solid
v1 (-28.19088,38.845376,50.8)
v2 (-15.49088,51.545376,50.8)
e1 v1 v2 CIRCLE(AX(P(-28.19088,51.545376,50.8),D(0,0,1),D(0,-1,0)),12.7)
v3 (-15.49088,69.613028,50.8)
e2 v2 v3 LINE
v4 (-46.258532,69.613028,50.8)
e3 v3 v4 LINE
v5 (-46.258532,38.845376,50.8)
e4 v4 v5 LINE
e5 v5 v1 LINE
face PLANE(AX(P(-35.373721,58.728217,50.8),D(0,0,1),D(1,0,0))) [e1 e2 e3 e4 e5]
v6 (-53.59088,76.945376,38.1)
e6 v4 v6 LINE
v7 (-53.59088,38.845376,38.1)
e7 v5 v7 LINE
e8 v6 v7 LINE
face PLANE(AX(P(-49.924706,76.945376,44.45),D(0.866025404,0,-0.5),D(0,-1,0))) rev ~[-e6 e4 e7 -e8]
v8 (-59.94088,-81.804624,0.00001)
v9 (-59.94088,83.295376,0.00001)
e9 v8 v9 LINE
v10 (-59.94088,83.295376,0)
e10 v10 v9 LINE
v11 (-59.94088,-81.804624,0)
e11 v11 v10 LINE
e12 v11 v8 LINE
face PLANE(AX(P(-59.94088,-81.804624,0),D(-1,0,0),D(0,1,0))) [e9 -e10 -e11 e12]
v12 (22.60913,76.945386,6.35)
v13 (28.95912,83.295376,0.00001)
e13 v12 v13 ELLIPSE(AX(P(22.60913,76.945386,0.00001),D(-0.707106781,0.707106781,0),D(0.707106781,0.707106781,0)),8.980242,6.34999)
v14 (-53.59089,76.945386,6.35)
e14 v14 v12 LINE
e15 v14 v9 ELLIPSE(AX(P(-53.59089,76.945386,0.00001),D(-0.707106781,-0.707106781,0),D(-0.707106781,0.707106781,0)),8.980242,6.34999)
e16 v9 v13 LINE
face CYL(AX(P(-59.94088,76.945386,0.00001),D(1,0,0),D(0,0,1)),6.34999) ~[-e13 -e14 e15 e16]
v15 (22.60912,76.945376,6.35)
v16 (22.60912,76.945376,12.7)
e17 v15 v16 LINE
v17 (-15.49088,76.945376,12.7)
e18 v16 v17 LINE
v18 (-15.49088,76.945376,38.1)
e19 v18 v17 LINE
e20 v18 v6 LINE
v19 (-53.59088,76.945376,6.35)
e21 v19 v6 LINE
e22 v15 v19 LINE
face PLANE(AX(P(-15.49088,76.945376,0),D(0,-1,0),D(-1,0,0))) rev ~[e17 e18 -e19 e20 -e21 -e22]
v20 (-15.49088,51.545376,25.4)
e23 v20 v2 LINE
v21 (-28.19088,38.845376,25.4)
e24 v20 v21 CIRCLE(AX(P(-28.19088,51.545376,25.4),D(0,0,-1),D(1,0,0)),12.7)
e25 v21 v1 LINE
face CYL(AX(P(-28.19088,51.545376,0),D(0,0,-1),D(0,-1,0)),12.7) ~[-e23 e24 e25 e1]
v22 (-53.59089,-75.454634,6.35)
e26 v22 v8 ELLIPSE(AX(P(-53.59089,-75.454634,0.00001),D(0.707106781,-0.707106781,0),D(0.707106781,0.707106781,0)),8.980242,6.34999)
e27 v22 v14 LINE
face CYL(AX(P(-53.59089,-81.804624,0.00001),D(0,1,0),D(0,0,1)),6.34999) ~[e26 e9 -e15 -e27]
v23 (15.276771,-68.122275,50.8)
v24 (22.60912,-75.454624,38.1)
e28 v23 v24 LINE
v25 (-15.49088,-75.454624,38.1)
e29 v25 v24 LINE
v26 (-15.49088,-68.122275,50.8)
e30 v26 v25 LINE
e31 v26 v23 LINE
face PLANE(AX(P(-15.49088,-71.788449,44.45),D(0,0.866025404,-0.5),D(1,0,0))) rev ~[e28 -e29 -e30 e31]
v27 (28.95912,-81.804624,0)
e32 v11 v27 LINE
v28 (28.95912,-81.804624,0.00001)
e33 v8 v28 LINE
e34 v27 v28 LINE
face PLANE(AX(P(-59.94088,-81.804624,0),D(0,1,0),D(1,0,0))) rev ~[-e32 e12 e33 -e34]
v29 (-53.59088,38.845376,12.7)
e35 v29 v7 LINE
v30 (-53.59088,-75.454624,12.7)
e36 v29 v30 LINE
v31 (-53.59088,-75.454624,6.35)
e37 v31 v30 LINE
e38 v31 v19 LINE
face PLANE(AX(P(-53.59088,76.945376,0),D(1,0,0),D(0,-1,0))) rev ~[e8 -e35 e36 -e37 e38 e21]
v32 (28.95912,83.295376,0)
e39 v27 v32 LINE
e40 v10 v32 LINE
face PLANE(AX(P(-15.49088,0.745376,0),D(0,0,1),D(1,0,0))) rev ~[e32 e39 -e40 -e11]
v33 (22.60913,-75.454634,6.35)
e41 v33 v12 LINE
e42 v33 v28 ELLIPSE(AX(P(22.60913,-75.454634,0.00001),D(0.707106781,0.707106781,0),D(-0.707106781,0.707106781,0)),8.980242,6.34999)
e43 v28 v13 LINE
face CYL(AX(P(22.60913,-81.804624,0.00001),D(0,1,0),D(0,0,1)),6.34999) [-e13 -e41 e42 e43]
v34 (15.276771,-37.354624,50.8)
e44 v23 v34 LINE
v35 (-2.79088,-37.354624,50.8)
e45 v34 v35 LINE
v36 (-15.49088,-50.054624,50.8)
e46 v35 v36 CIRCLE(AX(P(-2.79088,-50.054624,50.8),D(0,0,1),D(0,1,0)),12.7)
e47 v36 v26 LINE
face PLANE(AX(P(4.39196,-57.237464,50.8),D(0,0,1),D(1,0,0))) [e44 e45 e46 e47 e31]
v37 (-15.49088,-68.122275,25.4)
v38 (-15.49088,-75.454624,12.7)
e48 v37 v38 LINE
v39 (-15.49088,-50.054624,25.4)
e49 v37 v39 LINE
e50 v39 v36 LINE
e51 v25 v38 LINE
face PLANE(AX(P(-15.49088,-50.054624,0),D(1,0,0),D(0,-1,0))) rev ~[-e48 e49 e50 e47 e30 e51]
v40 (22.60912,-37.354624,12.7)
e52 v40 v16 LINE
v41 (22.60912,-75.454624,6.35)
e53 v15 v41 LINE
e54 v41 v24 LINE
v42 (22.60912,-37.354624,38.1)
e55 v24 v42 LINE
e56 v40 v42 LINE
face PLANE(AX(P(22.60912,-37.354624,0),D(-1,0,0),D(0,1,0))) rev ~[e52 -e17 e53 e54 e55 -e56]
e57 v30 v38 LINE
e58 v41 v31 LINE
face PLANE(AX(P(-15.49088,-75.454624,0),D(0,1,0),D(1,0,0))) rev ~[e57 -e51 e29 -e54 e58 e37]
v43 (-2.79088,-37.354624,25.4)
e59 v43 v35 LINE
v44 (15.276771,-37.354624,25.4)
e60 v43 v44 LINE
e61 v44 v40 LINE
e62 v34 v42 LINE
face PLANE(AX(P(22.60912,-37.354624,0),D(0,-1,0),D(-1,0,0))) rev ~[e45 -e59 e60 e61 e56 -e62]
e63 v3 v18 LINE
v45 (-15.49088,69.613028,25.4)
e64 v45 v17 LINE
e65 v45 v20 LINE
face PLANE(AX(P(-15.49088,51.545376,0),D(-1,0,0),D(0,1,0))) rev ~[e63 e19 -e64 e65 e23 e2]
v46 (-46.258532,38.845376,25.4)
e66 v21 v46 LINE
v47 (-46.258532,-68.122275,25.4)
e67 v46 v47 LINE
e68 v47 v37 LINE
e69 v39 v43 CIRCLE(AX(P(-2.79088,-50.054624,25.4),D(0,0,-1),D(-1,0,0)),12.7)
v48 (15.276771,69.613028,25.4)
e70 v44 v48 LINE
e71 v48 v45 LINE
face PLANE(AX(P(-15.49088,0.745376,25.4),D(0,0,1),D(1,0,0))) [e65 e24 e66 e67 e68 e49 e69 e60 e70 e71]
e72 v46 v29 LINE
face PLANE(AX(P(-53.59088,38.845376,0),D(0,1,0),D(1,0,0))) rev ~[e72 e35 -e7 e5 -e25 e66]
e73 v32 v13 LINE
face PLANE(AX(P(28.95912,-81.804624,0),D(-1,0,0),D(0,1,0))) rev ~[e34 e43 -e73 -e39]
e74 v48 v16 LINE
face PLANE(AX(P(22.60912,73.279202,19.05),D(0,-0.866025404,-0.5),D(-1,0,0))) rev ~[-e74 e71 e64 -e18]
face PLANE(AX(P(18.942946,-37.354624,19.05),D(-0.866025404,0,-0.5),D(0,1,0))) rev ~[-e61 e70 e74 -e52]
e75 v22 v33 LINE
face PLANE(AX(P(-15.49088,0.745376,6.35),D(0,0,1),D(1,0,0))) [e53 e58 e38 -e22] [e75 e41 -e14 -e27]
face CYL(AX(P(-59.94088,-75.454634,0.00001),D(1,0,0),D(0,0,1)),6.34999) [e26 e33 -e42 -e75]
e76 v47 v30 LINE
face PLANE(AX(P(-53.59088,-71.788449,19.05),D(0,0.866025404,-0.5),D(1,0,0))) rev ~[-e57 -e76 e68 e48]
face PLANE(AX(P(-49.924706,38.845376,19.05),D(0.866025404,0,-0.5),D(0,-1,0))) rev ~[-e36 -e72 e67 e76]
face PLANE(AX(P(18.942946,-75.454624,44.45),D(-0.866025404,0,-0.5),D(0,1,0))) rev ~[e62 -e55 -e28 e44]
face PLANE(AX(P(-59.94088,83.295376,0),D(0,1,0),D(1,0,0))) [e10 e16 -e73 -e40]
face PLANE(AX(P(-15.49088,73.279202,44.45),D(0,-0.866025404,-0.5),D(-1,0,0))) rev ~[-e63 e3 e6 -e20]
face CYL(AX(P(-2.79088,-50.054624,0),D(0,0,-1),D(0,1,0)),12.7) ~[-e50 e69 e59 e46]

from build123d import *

# Parameters (mm, degrees)
F0_W       = 88.9
F0_H       = 165.1
F1_DEPTH   = 6.35
F2_DEPTH   = 25.4
F3_DEPTH   = 50.8
F4_R       = 6.34999
F5_SIZE2   = 12.7
F5_SIZE    = 7.3323484187
F6_SIZE2   = 12.7
F6_SIZE    = 7.3323484187
F6_2_SIZE2 = 12.7
F6_2_SIZE  = 7.3323484187


# Not quite as in the source:
# - a fillet or chamfer is up to 0.001 mm smaller than in the source, because OpenCascade refuses the exact size


with BuildPart() as f1:
    # F0 (on Top) → F1 (new body)
    with BuildSketch(Plane.XY):
        with Locations((-15.4908802681, 0.7453764391)):
            Rectangle(F0_W, F0_H)
        Polygon((-53.5908802681, 38.8453764391), (-53.5908802681, 76.9453764391), (-15.4908802681, 76.9453764391), (22.6091197319, 76.9453764391), (22.6091197319, -37.3546235609), (22.6091197319, -75.4546235609), (-15.4908802681, -75.4546235609), (-53.5908802681, -75.4546235609), align=None, mode=Mode.SUBTRACT)
    extrude(amount=F1_DEPTH)

    # F0 (on Top) → F2 (join)
    with BuildSketch(Plane.XY):
        with BuildLine():
            Line((22.6091197319, 76.9453764391), (-15.4908802681, 76.9453764391))
            Line((-15.4908802681, 76.9453764391), (-15.4908802681, 51.5453764391))
            ThreePointArc((-15.4908802681, 51.5453764391), (-19.2106241471, 42.5651203181), (-28.1908802681, 38.8453764391))
            Line((-28.1908802681, 38.8453764391), (-53.5908802681, 38.8453764391))
            Line((-53.5908802681, 38.8453764391), (-53.5908802681, -75.4546235609))
            Line((-53.5908802681, -75.4546235609), (-15.4908802681, -75.4546235609))
            Line((-15.4908802681, -75.4546235609), (-15.4908802681, -50.0546235609))
            ThreePointArc((-15.4908802681, -50.0546235609), (-11.7711363892, -41.0743674398), (-2.7908802681, -37.3546235609))
            Line((-2.7908802681, -37.3546235609), (22.6091197319, -37.3546235609))
            Line((22.6091197319, -37.3546235609), (22.6091197319, 76.9453764391))
        make_face()
    extrude(amount=F2_DEPTH)

    # F0 (on Top) → F3 (join)
    with BuildSketch(Plane.XY):
        with BuildLine():
            Line((-15.4908802681, 76.9453764391), (-53.5908802681, 76.9453764391))
            Line((-53.5908802681, 76.9453764391), (-53.5908802681, 38.8453764391))
            Line((-53.5908802681, 38.8453764391), (-28.1908802681, 38.8453764391))
            ThreePointArc((-28.1908802681, 38.8453764391), (-19.2106241471, 42.5651203181), (-15.4908802681, 51.5453764391))
            Line((-15.4908802681, 51.5453764391), (-15.4908802681, 76.9453764391))
        make_face()
        with BuildLine():
            Line((22.6091197319, -75.4546235609), (22.6091197319, -37.3546235609))
            Line((22.6091197319, -37.3546235609), (-2.7908802681, -37.3546235609))
            ThreePointArc((-2.7908802681, -37.3546235609), (-11.7711363892, -41.0743674398), (-15.4908802681, -50.0546235609))
            Line((-15.4908802681, -50.0546235609), (-15.4908802681, -75.4546235609))
            Line((-15.4908802681, -75.4546235609), (22.6091197319, -75.4546235609))
        make_face()
    extrude(amount=F3_DEPTH)

    # F4 (radius 6.35 in the source; OpenCascade refuses exactly that, so slightly less here)
    f4_edges = [f1.edges().sort_by_distance(p)[0] for p in [
        (28.95912, 0.745376, 6.35),
        (-15.49088, -81.804624, 6.35),
        (-59.94088, 0.745376, 6.35),
        (-15.49088, 83.295376, 6.35),
    ]]
    fillet(f4_edges, radius=F4_R)

    # F5
    f5_edges = [f1.edges().sort_by_distance(p)[0] for p in [
        (-34.54088, -75.454624, 25.4),
        (-53.59088, -18.304624, 25.4),
        (22.60912, 19.795376, 25.4),
        (3.55912, 76.945376, 25.4),
    ]]
    f5_side = f1.faces().sort_by_distance((-15.49088, 0.745376, 25.4))[0]
    chamfer(f5_edges, length=F5_SIZE, length2=F5_SIZE2, reference=f5_side)

    # F6
    f6_edges = [f1.edges().sort_by_distance(p)[0] for p in [
        (-34.54088, 76.945376, 50.8),
        (-53.59088, 57.895376, 50.8),
    ]]
    f6_side = f1.faces().sort_by_distance((-34.936922, 58.291419, 50.8))[0]
    chamfer(f6_edges, length=F6_SIZE, length2=F6_SIZE2, reference=f6_side)

    # F6#2
    f6_2_edges = [f1.edges().sort_by_distance(p)[0] for p in [
        (22.60912, -56.404624, 50.8),
        (3.55912, -75.454624, 50.8),
    ]]
    f6_2_side = f1.faces().sort_by_distance((3.955162, -56.800666, 50.8))[0]
    chamfer(f6_2_edges, length=F6_2_SIZE, length2=F6_2_SIZE2, reference=f6_2_side)


solid = f1.part
